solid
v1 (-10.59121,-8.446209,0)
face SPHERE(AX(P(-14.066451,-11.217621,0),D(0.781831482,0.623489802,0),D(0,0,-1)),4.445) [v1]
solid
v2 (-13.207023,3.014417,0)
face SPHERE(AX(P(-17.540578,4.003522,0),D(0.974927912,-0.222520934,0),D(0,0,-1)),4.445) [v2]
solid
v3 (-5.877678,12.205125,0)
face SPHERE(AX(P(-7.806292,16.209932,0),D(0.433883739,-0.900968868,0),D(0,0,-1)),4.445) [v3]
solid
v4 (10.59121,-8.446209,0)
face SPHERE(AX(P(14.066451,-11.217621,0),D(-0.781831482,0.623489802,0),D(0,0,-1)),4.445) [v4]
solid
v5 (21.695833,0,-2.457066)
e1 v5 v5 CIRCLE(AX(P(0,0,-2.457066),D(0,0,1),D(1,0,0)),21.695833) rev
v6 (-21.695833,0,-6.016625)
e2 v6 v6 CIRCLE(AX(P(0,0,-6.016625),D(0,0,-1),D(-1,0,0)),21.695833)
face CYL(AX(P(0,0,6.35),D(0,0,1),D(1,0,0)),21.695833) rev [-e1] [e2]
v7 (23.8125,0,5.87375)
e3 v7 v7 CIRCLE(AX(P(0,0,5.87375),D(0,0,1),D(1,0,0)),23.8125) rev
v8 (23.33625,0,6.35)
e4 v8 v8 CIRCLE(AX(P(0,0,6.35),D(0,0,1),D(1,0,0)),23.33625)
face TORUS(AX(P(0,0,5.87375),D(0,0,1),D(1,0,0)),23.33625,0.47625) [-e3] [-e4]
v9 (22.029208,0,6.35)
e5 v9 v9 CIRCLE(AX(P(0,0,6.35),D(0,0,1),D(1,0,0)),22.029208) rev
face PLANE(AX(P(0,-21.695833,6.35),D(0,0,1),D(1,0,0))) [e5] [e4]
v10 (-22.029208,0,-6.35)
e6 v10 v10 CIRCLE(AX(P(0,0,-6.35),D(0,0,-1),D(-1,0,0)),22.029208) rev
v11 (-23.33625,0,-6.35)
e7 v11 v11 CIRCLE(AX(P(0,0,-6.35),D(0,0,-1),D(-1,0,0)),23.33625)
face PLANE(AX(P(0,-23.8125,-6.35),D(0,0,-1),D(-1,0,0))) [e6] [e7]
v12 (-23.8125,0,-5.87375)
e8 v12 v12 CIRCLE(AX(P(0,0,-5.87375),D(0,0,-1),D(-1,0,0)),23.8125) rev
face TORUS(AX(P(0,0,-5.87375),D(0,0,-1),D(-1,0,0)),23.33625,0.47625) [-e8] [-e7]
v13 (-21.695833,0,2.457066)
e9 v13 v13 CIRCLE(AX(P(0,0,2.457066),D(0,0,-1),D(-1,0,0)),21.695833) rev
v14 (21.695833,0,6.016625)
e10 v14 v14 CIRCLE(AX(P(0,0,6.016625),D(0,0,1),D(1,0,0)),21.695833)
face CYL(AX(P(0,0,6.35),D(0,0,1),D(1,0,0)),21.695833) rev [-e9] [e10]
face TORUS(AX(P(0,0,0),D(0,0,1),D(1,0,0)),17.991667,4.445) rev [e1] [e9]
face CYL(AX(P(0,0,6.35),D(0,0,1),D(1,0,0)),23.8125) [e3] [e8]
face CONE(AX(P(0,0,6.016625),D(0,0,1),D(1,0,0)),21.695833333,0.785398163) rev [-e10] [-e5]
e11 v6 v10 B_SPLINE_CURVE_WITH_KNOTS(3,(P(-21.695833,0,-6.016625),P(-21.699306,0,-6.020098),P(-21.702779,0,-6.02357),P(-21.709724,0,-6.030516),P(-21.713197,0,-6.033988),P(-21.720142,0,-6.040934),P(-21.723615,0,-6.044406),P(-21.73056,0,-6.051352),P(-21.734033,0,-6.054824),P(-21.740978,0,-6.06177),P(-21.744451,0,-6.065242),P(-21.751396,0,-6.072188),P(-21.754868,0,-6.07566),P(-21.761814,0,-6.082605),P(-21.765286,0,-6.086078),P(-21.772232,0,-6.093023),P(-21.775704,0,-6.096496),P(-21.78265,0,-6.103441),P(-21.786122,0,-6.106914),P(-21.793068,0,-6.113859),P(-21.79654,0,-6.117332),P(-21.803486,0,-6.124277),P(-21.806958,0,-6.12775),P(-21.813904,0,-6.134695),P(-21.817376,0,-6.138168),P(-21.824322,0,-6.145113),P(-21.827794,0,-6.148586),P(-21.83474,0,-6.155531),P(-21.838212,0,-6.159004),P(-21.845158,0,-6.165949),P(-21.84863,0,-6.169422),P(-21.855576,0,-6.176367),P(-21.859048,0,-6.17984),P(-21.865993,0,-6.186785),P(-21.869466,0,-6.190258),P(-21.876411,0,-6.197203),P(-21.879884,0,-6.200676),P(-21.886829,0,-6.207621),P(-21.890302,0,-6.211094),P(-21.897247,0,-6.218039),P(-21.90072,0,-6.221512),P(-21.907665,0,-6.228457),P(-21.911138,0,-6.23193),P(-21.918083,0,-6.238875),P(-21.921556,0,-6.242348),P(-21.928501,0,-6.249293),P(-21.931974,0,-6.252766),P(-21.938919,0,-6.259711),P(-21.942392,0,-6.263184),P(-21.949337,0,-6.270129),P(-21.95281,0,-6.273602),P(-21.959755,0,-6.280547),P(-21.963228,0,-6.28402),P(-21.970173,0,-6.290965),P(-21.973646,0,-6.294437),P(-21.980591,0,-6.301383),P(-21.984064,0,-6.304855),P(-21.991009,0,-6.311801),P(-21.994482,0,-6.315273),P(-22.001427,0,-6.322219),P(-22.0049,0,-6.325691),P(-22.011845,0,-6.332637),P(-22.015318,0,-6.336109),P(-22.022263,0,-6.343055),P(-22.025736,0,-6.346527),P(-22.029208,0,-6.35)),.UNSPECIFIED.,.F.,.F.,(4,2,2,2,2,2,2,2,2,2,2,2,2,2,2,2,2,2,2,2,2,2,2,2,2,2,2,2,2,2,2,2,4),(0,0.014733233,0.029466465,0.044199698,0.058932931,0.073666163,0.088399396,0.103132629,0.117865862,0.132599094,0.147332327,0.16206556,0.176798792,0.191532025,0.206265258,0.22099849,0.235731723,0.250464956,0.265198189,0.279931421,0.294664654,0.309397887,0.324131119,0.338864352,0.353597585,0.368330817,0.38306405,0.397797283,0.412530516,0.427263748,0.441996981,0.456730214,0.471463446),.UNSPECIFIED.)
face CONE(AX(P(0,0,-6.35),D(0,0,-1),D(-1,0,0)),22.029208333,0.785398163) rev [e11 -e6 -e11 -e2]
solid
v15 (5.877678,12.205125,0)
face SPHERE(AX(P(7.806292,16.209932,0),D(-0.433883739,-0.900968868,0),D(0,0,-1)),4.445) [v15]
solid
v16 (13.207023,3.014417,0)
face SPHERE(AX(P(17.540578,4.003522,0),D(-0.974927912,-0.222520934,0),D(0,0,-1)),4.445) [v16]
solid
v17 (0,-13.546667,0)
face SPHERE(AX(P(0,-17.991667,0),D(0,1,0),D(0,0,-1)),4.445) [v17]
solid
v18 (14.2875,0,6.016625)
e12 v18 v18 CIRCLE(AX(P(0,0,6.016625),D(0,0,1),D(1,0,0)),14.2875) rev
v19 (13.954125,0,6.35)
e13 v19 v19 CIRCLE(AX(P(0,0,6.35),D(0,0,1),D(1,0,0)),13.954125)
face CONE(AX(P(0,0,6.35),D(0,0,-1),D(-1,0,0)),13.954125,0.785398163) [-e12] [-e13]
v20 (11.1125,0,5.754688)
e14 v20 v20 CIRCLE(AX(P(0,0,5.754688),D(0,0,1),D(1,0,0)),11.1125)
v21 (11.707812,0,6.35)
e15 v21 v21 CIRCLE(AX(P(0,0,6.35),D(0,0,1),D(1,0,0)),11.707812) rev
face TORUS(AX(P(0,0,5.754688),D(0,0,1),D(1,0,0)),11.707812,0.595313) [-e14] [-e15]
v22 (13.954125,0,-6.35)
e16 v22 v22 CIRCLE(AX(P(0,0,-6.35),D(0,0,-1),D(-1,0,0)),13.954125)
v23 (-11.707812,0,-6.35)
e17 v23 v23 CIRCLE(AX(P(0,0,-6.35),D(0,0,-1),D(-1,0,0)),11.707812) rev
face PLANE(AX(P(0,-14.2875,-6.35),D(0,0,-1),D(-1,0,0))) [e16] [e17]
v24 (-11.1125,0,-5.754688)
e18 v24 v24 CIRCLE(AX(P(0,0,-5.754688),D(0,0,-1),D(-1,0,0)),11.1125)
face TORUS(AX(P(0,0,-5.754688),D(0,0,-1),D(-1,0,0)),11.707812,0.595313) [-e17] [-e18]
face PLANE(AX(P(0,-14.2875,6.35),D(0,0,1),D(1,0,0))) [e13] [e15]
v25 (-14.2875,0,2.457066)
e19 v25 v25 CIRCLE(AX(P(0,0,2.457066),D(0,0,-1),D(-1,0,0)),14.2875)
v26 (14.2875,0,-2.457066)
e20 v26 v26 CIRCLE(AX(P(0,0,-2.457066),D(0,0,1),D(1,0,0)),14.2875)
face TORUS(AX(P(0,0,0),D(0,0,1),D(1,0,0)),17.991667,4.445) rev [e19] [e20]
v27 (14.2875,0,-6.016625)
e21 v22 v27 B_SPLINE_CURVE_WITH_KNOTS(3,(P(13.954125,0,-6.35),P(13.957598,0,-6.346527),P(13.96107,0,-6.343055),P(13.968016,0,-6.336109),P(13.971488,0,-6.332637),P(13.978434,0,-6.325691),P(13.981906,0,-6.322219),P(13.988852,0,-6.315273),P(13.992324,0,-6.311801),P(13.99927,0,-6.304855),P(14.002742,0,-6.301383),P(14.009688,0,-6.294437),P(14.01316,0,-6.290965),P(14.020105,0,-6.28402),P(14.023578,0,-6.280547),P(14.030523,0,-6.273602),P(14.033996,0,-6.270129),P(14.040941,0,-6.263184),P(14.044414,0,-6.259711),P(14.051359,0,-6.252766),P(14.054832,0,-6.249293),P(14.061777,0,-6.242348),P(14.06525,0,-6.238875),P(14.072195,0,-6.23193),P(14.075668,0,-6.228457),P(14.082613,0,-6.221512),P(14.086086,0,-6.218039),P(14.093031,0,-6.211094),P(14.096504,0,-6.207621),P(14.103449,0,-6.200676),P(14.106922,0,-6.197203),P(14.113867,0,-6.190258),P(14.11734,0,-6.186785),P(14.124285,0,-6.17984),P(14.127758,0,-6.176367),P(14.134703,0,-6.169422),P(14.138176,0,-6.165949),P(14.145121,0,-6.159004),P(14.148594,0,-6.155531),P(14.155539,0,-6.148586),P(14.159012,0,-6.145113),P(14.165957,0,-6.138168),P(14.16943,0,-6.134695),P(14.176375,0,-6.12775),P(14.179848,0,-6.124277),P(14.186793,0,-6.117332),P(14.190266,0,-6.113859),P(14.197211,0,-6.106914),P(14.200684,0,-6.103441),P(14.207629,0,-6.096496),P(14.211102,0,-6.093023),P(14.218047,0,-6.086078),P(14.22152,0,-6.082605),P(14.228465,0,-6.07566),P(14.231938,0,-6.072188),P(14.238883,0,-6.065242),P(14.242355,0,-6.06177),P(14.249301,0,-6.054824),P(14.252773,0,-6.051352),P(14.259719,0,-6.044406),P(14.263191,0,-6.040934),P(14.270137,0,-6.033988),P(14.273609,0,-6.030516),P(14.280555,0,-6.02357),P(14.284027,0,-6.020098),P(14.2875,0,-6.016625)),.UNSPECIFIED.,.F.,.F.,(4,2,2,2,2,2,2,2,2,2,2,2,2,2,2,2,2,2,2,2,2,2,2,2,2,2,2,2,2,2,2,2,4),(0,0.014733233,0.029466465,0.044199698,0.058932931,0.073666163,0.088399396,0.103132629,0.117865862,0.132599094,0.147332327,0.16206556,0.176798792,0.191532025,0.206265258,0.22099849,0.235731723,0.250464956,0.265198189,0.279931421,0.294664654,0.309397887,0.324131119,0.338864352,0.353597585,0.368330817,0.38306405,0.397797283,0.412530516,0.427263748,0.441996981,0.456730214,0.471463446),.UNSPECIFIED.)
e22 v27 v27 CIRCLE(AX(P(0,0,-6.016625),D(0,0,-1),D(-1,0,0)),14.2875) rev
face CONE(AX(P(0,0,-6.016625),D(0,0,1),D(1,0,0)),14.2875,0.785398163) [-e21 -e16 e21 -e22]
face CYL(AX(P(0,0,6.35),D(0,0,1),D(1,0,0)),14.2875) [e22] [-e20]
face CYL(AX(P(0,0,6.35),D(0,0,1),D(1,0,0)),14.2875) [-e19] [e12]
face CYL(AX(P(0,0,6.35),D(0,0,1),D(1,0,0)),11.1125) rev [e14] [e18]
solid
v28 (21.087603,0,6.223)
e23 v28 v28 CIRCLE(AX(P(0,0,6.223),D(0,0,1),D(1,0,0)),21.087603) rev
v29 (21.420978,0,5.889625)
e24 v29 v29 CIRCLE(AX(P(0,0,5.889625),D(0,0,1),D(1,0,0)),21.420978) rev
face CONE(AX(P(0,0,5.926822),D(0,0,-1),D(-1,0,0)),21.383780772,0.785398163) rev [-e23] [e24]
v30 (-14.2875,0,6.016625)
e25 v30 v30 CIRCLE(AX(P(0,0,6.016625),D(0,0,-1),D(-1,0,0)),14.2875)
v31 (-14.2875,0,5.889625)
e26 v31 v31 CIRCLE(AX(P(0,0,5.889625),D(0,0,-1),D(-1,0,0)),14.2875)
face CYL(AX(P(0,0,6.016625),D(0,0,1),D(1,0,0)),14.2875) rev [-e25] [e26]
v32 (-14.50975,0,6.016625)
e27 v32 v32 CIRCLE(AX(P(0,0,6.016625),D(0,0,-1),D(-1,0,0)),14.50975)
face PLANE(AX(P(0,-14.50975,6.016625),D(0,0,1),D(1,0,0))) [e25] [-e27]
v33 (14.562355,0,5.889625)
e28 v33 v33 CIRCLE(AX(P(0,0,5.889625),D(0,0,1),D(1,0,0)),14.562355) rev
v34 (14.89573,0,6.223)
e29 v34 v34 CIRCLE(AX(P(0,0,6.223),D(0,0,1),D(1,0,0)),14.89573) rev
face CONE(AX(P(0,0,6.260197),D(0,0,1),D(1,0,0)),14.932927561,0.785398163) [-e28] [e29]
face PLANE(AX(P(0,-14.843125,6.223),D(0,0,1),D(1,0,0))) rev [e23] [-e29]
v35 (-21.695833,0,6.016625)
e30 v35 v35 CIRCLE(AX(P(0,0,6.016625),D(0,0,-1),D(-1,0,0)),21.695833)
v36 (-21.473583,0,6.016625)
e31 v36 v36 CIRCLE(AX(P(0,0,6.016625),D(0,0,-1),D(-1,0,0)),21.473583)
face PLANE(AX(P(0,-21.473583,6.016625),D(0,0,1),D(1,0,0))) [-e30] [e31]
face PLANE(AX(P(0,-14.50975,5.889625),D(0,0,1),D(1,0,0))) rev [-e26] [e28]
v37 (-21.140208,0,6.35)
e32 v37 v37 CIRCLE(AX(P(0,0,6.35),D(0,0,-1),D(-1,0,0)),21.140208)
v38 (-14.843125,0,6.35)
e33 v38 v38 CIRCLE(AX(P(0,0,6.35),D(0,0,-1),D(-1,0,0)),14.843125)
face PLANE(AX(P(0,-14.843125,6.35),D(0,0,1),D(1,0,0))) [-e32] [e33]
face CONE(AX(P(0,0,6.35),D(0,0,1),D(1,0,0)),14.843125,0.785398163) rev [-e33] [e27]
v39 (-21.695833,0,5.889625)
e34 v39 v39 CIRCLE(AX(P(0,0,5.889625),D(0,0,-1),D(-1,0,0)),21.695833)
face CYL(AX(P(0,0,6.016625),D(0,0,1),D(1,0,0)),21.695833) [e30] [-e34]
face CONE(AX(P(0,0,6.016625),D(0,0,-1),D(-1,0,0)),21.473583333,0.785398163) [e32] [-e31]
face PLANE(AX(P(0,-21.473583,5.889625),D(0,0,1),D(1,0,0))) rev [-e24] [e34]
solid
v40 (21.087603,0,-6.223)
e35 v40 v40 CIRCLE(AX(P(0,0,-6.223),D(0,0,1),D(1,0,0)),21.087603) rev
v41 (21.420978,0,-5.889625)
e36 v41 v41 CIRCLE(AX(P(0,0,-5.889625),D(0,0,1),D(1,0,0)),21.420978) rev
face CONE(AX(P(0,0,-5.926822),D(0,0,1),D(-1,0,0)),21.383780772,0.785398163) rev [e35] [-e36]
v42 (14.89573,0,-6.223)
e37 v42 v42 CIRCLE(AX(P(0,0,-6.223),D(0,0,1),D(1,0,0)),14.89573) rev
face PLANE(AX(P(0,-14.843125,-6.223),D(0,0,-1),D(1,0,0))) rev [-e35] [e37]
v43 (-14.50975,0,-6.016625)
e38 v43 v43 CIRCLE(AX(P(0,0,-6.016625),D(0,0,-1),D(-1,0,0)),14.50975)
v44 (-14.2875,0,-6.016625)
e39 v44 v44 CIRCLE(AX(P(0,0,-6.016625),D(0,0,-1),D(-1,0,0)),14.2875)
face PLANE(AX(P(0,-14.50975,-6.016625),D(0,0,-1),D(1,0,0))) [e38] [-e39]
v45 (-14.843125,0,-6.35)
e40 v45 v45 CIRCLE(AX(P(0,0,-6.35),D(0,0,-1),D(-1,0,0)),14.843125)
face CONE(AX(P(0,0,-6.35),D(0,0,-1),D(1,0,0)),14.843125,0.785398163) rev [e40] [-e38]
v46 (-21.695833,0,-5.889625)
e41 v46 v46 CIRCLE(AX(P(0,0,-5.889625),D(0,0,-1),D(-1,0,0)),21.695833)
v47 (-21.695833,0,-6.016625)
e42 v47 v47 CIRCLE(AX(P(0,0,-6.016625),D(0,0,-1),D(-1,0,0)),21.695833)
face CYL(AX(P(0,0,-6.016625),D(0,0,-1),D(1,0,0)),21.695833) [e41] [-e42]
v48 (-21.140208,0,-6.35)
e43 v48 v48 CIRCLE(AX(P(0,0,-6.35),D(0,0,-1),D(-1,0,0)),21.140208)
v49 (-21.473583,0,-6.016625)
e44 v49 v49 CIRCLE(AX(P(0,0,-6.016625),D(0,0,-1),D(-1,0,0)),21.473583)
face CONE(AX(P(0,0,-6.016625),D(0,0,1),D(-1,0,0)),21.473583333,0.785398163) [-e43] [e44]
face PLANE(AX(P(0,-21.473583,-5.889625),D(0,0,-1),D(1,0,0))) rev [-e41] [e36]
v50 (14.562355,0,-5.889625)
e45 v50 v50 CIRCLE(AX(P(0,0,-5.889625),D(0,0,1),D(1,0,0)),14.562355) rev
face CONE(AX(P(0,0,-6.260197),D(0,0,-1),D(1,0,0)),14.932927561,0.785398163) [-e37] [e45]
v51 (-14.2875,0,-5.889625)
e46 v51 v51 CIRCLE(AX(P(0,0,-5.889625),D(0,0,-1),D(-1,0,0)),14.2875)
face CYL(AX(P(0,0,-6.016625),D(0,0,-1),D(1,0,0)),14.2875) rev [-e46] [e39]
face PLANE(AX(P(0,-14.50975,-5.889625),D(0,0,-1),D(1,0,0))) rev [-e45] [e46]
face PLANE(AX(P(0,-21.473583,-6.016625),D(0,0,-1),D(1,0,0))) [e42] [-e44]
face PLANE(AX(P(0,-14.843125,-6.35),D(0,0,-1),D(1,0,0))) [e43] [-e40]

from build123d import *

# Parameters (mm, degrees)
SKETCH3_W         = 12.7
SKETCH3_H         = 2.116666667
SKETCH3_H_2       = 3.175
SKETCH4_R         = 4.445
CIRPATTERN1_COUNT = 7
FILLET1_R         = 0.47625
FILLET2_R         = 0.5953125
CHAMFER1_SIZE     = 0.333375
CHAMFER2_SIZE     = 0.333375


# Read off the part's stored shape, not the designer's step: Thicken1
with BuildPart() as part:
    # Sketch3 → Revolve1 (revolve)
    with BuildSketch(Plane(origin=(0, 0, 0), x_dir=(0, 0, -1), z_dir=(1, 0, 0)), mode=Mode.PRIVATE) as revolve1_sk:
        with Locations((0, -22.754166667)):
            Rectangle(SKETCH3_W, SKETCH3_H)
        with Locations((0, -12.7)):
            Rectangle(SKETCH3_W, SKETCH3_H_2)
    revolve(revolve1_sk.sketch.rotate(Axis((0, 0, 6.35), (0, 0, -1)), 270), axis=Axis((0, 0, 6.35), (0, 0, -1)))

    # Sketch4 → Cut-Revolve1 (revolve, cut)
    with BuildSketch(Plane(origin=(0, 0, 0), x_dir=(0, 0, -1), z_dir=(1, 0, 0)), mode=Mode.PRIVATE) as cut_revolve1_sk:
        with Locations((0, -17.991666667)):
            Circle(SKETCH4_R)
    revolve(cut_revolve1_sk.sketch.rotate(Axis((0, 0, 6.35), (0, 0, -1)), 270), axis=Axis((0, 0, 6.35), (0, 0, -1)), mode=Mode.SUBTRACT)

    # Fillet1
    fillet1_edges = [part.edges().sort_by_distance(p)[0] for p in [
        (-23.8125, 0, -6.35),
        (-23.8125, 0, 6.35),
    ]]
    fillet(fillet1_edges, radius=FILLET1_R)

    # Fillet2
    fillet2_edges = [part.edges().sort_by_distance(p)[0] for p in [
        (-11.1125, 0, -6.35),
        (-11.1125, 0, 6.35),
    ]]
    fillet(fillet2_edges, radius=FILLET2_R)

    # Chamfer1
    chamfer1_edges = [part.edges().sort_by_distance(p)[0] for p in [
        (-21.695833333, 0, 6.35),
        (-21.695833333, 0, -6.35),
    ]]
    chamfer(chamfer1_edges, length=CHAMFER1_SIZE)

    # Chamfer2
    chamfer2_edges = [part.edges().sort_by_distance(p)[0] for p in [
        (-14.2875, 0, 6.35),
        (-14.2875, 0, -6.35),
    ]]
    chamfer(chamfer2_edges, length=CHAMFER2_SIZE)


with BuildPart() as body_2:
    # Sketch5 → Revolve2 (revolve)
    with BuildSketch(Plane(origin=(0, 0, 0), x_dir=(0, 0, -1), z_dir=(1, 0, 0))):
        with BuildLine():
            Line((0, -13.546666667), (0, -22.436666667))
            ThreePointArc((0, -22.436666667), (4.445, -17.991666667), (0, -13.546666667))
        make_face()
    revolve(axis=Axis((0, -13.546666667, 0), (0, -1, 0)))


with BuildPart() as cirpattern1_1:
    # CirPattern1: pattern copy
    add(body_2.part.rotate(Axis((0, 0, 0), (0, 0, 1)), 1 * 360 / CIRPATTERN1_COUNT))


with BuildPart() as cirpattern1_2:
    # CirPattern1: pattern copy
    add(body_2.part.rotate(Axis((0, 0, 0), (0, 0, 1)), 2 * 360 / CIRPATTERN1_COUNT))


with BuildPart() as cirpattern1_3:
    # CirPattern1: pattern copy
    add(body_2.part.rotate(Axis((0, 0, 0), (0, 0, 1)), 3 * 360 / CIRPATTERN1_COUNT))


with BuildPart() as cirpattern1_4:
    # CirPattern1: pattern copy
    add(body_2.part.rotate(Axis((0, 0, 0), (0, 0, 1)), 4 * 360 / CIRPATTERN1_COUNT))


with BuildPart() as cirpattern1_5:
    # CirPattern1: pattern copy
    add(body_2.part.rotate(Axis((0, 0, 0), (0, 0, 1)), 5 * 360 / CIRPATTERN1_COUNT))


with BuildPart() as cirpattern1_6:
    # CirPattern1: pattern copy
    add(body_2.part.rotate(Axis((0, 0, 0), (0, 0, 1)), 6 * 360 / CIRPATTERN1_COUNT))


with BuildPart() as body_9:
    # Thicken1 outline → Thicken1 (revolve)
    with BuildSketch(Plane.XZ):
        Polygon((14.2875, 6.016625), (14.2875, 5.889625), (14.562355122, 5.889625), (14.895730122, 6.223), (21.087603211, 6.223), (21.420978211, 5.889625), (21.695833333, 5.889625), (21.695833333, 6.016625), (21.473583333, 6.016625), (21.140208333, 6.35), (14.843125, 6.35), (14.50975, 6.016625), align=None)
    revolve(axis=Axis((0, 0, 0), (0, 0, 1)))


with BuildPart() as body_10:
    # Mirror1: mirrored copy
    add(body_9.part.mirror(Plane.XY))


solid = Compound([part.part, body_2.part, cirpattern1_1.part, cirpattern1_2.part, cirpattern1_3.part, cirpattern1_4.part, cirpattern1_5.part, cirpattern1_6.part, body_9.part, body_10.part])
